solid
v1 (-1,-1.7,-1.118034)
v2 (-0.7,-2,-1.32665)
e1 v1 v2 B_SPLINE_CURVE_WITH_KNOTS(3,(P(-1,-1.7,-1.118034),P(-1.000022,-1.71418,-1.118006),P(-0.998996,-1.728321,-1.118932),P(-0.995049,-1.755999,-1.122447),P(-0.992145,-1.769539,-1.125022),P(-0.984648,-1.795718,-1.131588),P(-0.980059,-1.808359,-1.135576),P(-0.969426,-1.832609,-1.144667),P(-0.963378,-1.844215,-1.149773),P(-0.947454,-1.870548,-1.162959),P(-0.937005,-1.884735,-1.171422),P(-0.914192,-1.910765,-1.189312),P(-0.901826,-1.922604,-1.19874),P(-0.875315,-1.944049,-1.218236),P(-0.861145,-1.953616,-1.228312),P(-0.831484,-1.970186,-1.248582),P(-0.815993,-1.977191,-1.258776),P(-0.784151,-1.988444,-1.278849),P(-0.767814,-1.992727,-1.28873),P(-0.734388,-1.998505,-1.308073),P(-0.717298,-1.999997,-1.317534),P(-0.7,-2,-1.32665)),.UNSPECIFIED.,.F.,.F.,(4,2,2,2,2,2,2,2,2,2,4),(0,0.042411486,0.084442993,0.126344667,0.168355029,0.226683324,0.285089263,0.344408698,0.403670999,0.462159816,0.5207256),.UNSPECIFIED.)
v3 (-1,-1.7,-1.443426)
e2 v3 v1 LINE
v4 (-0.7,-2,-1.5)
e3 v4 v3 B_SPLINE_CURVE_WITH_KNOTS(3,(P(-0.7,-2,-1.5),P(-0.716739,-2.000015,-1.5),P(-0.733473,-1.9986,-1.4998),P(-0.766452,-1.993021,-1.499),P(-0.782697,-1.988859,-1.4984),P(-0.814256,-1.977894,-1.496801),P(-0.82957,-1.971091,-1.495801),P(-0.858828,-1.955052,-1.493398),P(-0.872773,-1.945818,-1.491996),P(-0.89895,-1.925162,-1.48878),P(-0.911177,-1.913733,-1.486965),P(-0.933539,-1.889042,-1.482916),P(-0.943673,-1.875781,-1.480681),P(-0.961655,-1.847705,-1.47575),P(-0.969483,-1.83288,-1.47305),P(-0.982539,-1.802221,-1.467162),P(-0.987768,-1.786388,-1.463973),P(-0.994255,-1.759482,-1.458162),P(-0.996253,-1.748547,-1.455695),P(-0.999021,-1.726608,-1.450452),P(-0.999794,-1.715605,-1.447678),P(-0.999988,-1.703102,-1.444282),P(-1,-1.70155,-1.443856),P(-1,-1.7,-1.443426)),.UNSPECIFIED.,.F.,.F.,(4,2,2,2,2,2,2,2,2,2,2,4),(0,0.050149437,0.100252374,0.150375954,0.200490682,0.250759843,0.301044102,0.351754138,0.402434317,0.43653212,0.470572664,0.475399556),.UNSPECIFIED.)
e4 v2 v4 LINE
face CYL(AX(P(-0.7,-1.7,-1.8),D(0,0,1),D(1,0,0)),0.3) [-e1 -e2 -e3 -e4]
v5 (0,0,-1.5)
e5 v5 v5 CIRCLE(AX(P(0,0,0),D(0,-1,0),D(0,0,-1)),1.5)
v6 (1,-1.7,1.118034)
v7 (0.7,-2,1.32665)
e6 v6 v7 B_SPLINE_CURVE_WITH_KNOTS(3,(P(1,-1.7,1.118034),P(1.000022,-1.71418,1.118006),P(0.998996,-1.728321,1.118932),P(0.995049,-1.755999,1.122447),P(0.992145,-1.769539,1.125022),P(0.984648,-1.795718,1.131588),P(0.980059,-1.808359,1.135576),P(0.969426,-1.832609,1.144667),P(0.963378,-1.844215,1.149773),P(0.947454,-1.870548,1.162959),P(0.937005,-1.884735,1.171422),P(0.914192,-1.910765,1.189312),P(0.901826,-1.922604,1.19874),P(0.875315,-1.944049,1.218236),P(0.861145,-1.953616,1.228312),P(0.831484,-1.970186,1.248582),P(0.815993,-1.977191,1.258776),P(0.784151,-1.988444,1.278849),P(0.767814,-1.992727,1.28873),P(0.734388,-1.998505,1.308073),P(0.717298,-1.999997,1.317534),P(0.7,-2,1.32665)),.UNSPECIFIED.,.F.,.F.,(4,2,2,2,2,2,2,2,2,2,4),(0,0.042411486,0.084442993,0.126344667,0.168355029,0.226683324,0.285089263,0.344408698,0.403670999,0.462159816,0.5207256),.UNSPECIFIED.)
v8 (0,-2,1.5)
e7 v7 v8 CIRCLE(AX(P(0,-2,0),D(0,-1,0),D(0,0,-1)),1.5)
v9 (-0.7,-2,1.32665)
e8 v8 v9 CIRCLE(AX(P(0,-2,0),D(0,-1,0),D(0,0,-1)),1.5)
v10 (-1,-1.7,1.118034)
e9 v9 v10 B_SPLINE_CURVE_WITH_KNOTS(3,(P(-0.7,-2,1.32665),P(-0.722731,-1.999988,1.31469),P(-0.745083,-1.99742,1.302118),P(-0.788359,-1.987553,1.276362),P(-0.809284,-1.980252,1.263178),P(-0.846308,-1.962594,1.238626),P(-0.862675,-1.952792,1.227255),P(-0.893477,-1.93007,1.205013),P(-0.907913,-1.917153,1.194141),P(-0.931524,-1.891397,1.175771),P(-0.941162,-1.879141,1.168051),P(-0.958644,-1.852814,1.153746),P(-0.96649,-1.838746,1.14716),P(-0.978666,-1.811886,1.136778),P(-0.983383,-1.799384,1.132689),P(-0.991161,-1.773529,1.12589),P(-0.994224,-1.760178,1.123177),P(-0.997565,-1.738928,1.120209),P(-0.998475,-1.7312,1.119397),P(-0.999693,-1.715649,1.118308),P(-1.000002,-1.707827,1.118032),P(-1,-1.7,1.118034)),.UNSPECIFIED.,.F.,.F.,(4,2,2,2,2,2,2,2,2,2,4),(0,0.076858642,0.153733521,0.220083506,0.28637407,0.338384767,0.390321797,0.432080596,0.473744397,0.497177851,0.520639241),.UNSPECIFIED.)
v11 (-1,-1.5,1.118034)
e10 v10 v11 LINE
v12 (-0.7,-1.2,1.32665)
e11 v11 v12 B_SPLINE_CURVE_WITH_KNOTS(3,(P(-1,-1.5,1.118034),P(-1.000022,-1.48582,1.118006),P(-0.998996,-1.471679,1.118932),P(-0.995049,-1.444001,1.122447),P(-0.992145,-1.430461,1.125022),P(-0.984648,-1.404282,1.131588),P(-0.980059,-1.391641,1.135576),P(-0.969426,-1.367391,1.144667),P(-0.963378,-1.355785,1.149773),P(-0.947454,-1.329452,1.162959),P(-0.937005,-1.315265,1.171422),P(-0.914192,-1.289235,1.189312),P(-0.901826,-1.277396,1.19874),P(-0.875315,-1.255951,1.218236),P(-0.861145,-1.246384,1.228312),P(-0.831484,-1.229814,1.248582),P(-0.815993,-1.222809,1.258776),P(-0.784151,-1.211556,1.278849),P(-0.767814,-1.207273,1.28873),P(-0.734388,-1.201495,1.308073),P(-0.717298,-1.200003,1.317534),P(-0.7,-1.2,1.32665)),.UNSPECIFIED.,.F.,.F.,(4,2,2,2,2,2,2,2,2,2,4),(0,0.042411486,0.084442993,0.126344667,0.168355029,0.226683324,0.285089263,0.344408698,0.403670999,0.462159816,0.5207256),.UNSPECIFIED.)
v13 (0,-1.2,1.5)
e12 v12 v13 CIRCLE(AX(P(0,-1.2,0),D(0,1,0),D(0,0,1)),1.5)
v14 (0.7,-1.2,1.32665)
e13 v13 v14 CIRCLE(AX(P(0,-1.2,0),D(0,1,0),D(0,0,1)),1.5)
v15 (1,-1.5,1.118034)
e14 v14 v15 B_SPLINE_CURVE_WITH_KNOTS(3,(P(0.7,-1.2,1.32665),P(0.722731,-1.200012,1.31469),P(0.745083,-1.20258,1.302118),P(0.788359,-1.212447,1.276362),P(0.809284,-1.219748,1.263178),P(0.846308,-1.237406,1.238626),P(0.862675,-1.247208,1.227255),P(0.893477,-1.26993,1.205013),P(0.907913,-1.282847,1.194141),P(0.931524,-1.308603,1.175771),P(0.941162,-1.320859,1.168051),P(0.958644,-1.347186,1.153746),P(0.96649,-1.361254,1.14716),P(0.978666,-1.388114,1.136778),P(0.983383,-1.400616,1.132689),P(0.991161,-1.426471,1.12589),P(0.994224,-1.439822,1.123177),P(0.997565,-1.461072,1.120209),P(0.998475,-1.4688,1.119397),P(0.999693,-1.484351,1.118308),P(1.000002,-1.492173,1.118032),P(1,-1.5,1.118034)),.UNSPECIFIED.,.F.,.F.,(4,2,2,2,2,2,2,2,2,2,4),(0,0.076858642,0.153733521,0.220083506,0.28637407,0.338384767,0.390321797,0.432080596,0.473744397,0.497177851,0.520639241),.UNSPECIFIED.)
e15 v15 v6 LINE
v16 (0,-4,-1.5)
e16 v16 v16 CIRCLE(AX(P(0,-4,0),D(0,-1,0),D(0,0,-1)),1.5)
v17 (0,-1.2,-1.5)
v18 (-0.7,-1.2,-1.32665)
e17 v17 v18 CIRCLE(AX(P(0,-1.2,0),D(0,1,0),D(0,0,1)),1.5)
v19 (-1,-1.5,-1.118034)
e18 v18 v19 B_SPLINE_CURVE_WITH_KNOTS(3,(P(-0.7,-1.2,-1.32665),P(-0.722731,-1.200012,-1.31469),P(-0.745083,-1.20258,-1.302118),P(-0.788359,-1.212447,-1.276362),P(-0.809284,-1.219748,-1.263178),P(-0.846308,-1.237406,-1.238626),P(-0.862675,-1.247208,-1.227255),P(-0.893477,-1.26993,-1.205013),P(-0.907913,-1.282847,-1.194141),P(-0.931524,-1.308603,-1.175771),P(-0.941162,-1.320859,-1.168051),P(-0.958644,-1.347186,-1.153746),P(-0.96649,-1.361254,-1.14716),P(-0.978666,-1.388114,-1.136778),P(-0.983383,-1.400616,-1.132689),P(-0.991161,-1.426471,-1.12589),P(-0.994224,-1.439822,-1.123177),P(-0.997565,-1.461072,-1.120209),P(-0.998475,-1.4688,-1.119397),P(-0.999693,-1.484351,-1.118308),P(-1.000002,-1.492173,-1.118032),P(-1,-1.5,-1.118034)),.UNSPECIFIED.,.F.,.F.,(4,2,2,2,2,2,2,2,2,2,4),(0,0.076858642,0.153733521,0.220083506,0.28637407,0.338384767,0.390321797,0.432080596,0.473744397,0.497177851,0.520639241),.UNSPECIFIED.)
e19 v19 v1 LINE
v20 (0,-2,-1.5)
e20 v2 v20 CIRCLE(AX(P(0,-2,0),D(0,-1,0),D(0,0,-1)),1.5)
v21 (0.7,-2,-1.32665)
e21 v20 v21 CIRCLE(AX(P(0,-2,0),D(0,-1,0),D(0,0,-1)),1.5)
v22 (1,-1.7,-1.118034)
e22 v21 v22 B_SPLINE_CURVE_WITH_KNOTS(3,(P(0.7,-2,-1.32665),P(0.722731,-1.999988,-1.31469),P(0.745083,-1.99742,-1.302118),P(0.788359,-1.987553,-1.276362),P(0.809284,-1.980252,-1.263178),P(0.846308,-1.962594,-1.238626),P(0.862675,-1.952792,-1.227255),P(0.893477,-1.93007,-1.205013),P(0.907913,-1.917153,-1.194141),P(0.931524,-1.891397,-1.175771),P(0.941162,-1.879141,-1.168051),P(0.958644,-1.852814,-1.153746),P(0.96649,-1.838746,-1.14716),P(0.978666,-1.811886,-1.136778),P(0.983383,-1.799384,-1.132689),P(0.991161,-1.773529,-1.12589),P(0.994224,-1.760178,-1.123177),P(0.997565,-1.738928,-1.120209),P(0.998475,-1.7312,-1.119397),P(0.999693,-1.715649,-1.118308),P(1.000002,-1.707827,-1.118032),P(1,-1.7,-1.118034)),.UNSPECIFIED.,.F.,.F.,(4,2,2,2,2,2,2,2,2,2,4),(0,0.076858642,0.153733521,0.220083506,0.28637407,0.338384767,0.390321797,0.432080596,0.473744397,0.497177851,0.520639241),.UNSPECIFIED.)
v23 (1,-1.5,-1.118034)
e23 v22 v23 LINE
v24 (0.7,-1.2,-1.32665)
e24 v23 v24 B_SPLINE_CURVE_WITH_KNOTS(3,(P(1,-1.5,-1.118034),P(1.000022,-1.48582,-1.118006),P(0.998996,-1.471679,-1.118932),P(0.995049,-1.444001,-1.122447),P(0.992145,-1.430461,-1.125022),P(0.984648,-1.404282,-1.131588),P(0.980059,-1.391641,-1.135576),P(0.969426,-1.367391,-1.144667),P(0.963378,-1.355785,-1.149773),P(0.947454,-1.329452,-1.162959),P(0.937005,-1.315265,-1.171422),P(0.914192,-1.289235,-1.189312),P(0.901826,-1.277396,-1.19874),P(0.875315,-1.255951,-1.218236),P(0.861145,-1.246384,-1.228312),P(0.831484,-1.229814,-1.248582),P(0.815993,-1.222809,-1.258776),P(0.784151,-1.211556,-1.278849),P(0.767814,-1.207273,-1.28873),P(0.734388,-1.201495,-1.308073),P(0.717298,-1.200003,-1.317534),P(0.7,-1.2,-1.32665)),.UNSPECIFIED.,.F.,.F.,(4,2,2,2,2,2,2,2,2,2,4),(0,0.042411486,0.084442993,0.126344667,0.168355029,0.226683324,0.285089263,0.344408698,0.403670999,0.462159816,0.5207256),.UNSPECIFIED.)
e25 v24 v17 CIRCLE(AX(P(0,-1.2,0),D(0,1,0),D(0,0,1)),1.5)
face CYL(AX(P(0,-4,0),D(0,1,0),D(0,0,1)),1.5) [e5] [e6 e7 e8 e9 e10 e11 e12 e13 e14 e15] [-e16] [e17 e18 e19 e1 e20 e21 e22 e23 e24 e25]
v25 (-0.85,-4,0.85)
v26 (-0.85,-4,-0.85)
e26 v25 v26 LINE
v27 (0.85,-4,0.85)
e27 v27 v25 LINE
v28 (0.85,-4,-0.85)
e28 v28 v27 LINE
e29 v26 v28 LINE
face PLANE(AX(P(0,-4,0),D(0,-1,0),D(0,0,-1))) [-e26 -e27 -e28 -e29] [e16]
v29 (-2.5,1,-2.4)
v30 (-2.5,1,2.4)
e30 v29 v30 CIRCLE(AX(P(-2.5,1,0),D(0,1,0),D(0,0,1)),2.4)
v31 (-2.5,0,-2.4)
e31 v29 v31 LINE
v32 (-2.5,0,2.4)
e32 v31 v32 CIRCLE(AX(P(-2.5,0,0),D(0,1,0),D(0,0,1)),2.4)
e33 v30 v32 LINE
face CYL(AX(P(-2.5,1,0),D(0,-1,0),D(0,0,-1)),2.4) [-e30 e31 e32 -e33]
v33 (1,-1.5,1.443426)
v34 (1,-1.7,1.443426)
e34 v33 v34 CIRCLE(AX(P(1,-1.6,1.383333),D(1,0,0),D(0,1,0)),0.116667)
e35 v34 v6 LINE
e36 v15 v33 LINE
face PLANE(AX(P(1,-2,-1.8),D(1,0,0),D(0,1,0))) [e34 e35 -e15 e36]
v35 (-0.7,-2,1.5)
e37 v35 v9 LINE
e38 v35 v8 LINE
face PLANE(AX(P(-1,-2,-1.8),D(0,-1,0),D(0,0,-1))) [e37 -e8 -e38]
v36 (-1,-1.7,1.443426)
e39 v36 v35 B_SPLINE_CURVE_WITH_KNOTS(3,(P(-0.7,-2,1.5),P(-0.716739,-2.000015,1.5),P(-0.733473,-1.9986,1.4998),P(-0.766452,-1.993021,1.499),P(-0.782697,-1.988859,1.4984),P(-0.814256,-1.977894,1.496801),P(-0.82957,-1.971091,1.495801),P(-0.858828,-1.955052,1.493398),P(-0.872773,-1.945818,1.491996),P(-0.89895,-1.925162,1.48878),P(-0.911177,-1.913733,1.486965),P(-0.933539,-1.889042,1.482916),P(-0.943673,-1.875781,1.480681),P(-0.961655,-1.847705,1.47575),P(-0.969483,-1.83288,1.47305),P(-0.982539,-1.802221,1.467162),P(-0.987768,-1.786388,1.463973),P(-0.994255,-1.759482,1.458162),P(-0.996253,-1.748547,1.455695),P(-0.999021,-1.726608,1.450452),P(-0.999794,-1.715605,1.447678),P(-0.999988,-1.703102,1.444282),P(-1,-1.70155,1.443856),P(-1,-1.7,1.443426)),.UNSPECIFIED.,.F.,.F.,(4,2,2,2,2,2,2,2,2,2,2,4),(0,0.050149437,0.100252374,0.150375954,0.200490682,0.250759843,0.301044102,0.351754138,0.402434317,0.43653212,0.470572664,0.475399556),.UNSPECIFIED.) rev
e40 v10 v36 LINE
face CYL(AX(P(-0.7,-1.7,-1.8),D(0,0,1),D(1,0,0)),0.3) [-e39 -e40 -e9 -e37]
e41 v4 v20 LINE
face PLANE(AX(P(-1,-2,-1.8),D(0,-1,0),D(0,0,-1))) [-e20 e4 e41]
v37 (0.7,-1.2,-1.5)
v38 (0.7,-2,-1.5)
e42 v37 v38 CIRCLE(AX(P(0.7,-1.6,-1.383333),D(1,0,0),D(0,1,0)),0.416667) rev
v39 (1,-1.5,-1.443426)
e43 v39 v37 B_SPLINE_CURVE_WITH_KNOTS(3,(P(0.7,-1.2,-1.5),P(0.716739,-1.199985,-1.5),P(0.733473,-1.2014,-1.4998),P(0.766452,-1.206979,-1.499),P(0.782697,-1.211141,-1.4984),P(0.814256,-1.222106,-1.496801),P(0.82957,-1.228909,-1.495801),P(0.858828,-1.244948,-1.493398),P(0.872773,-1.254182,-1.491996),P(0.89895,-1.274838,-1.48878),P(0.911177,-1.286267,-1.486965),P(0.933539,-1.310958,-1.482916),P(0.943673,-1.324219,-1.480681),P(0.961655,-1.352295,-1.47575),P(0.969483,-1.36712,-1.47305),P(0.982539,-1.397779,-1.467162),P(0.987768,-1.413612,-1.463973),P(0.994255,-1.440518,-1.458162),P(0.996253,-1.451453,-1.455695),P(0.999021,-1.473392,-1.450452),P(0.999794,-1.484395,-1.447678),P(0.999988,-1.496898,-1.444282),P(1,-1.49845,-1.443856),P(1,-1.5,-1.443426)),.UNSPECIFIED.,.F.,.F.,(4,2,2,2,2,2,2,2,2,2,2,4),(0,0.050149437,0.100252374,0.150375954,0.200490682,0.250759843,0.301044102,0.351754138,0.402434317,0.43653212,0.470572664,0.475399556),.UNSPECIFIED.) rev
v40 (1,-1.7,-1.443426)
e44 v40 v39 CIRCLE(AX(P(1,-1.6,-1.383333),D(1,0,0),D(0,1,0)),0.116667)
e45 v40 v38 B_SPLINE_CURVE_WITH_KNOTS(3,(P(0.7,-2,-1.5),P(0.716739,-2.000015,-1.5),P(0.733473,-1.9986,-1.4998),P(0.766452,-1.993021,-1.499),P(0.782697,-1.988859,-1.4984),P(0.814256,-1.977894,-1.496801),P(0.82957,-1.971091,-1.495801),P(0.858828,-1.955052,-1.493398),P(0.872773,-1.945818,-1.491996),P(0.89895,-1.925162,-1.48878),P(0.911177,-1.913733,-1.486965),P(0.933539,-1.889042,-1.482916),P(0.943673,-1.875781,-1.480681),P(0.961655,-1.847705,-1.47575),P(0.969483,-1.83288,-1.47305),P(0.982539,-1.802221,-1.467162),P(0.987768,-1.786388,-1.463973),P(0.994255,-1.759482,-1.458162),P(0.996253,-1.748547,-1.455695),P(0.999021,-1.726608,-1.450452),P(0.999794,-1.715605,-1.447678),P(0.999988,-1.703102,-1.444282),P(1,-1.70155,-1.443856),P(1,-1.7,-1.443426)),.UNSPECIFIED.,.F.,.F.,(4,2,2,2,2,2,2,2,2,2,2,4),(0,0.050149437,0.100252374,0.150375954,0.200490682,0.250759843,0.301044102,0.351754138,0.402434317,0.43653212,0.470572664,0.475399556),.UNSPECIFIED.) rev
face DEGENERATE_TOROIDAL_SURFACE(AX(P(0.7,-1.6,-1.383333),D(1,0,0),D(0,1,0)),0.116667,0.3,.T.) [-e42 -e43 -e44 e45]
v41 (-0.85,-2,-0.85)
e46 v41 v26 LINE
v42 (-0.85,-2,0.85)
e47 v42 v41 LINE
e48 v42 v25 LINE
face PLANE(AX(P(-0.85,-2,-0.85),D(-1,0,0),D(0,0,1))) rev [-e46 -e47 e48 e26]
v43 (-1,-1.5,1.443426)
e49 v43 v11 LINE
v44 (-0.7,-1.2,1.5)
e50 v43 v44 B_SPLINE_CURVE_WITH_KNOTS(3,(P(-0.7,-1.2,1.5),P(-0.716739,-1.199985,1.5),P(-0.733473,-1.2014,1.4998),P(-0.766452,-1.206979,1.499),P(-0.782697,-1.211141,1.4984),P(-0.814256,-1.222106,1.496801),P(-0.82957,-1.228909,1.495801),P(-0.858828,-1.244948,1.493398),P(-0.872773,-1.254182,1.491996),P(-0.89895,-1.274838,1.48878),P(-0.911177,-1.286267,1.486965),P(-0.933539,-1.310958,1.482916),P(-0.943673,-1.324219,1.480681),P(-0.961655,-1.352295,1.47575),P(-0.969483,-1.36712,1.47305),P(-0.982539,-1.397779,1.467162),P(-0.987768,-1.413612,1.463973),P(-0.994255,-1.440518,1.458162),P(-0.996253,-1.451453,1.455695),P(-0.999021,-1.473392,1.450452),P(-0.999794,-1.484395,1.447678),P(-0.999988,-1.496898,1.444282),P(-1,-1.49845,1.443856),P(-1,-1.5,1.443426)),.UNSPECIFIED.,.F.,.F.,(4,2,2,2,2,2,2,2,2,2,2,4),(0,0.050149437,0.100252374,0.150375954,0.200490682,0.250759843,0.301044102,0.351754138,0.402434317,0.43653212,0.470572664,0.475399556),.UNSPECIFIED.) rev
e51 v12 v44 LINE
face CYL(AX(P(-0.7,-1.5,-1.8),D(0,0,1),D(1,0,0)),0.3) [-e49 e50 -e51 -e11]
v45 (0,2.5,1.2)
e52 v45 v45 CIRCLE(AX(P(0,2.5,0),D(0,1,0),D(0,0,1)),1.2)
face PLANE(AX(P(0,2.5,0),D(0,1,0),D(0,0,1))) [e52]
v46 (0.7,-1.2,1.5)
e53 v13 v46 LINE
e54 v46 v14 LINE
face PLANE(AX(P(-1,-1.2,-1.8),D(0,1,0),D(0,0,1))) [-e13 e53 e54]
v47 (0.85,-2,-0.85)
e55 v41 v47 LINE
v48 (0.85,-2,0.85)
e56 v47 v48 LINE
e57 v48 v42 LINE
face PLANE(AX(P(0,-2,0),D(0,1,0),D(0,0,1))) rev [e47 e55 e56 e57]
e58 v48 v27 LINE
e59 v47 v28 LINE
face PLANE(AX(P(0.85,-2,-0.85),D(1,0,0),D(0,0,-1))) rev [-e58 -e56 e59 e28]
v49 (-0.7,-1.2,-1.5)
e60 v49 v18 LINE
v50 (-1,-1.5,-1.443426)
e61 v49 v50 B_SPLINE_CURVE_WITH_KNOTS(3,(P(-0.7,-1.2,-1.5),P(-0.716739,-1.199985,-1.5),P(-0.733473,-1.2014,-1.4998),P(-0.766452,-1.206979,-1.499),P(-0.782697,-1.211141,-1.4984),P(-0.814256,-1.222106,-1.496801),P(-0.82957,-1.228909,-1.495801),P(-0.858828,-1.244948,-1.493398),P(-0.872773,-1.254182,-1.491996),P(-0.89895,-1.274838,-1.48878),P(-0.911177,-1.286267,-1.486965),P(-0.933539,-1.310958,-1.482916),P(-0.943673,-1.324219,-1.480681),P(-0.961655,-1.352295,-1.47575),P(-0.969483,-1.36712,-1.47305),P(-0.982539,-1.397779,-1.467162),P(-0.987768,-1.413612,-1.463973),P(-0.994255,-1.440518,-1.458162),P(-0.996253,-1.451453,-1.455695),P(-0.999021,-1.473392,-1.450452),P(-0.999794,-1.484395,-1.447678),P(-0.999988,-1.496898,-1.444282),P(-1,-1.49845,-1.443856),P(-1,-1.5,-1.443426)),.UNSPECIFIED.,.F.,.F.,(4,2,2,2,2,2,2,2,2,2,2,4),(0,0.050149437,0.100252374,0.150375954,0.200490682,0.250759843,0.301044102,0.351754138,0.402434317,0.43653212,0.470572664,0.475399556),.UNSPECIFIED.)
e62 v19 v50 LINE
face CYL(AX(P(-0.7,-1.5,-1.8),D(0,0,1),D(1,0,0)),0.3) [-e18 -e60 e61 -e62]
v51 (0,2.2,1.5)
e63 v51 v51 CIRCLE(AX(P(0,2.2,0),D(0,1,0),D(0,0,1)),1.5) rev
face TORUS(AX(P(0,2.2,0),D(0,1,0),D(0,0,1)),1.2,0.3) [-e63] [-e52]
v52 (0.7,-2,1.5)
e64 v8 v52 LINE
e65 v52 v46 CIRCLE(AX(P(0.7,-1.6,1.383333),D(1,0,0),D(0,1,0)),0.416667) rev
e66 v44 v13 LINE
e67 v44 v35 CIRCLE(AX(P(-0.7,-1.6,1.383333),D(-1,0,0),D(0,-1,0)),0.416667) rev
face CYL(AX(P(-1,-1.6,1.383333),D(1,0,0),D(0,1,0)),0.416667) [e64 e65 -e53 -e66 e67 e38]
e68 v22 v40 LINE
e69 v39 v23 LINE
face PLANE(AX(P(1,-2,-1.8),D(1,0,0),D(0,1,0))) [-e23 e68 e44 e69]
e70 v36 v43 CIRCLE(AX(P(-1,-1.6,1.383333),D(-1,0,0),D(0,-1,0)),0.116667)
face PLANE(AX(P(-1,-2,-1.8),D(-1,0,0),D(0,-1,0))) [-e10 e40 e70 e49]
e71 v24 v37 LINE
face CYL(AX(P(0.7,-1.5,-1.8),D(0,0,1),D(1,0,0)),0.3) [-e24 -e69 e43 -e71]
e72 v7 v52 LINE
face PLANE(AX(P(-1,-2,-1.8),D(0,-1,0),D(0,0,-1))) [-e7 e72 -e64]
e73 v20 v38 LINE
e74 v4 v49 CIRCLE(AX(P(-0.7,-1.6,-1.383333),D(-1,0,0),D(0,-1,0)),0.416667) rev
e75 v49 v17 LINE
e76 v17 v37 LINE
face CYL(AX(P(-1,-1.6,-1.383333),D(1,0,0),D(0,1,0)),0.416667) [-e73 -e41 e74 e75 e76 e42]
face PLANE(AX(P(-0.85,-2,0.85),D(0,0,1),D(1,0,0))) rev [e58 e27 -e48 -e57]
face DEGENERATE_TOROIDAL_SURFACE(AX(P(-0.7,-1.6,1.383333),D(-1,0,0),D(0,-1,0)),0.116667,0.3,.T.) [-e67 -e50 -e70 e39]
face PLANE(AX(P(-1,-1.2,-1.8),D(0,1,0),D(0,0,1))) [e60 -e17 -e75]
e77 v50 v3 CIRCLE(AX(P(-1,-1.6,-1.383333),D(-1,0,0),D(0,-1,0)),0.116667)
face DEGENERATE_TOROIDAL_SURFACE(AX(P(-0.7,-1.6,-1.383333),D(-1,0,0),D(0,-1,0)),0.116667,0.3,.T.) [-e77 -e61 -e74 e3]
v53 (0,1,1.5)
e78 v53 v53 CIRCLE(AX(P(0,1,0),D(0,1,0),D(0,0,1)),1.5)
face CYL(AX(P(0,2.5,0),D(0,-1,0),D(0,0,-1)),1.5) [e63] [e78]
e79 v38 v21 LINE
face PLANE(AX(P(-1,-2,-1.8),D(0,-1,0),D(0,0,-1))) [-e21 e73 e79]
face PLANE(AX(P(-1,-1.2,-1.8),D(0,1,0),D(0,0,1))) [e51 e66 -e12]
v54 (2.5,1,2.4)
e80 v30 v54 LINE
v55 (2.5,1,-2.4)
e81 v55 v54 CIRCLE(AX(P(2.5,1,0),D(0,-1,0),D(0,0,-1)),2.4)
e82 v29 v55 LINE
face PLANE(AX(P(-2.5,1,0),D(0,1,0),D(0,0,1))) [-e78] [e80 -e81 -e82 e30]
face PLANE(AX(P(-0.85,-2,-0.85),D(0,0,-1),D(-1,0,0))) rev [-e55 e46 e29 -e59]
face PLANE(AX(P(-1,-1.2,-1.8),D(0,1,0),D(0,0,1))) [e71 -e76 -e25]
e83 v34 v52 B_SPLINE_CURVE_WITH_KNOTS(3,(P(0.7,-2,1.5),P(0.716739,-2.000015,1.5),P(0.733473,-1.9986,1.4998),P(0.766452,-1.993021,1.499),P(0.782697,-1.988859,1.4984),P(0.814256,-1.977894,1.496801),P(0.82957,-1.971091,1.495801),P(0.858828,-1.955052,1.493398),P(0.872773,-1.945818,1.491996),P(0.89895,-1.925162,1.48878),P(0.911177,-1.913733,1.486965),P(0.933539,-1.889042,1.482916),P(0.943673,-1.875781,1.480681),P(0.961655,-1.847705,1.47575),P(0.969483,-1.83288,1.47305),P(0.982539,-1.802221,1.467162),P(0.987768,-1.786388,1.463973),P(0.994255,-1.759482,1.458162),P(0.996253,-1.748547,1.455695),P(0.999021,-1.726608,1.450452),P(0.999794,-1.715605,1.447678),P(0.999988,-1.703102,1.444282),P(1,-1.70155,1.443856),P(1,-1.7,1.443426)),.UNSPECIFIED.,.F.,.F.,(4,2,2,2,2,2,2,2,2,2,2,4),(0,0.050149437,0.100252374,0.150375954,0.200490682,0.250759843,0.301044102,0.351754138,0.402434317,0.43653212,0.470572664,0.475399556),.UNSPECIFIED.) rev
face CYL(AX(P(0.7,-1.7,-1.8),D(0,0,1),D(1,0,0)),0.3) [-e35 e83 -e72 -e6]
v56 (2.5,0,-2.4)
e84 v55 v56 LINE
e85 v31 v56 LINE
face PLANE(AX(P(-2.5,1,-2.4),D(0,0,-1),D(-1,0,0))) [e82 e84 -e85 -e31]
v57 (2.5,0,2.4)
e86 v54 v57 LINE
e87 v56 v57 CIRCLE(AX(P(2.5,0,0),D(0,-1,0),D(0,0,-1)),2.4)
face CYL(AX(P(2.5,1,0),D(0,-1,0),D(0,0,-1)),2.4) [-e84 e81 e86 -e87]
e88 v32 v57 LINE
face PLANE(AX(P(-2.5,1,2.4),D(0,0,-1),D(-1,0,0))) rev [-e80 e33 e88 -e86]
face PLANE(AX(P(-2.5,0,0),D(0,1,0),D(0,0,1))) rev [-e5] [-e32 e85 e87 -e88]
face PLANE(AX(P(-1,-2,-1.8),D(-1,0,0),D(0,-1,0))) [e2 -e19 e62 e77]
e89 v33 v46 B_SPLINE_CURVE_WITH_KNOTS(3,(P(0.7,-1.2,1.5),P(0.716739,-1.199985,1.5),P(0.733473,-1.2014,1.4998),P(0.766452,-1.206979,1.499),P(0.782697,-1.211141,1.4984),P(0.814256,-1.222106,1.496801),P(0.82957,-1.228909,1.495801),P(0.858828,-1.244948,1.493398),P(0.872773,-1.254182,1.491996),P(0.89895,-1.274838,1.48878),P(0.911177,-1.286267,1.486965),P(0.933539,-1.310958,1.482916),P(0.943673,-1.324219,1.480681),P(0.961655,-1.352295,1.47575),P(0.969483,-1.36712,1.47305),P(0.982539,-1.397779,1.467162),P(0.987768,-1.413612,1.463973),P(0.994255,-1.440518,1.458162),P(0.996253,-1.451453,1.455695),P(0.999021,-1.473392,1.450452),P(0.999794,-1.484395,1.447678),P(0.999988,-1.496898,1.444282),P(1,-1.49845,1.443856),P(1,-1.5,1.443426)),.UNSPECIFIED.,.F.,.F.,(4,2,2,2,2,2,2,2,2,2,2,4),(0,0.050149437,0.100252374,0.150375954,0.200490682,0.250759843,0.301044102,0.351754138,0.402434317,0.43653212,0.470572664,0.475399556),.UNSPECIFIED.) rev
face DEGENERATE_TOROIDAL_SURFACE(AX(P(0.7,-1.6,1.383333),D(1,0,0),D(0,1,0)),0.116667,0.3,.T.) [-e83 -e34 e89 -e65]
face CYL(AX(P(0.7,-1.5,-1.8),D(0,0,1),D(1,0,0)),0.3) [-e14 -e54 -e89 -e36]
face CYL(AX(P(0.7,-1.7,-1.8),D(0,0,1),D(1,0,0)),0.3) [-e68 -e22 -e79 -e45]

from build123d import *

# Parameters (mm, degrees)
EXTRUDE_1294_DEPTH   = 1
SKETCH_1344_R        = 1.5
EXTRUDE_1_DEPTH      = 1.5
EXTRUDE_START        = 4
SKETCH_1505_R        = 1.5
EXTRUDE_2_DEPTH      = 4
EXTRUDE_3_DEPTH      = 1.8
EXTRUDE_3_DEPTH_BACK = 1.8
CUT_EXTRUDE_1_DEPTH  = 2
SKETCH_6_W           = 1.7
SKETCH_6_H           = 1.7
CUT_EXTRUDE_2_DEPTH  = 2
FILLET_1_R           = 0.3


with BuildPart() as part:
    # Sketch 213 → Extrude 1294 (new body)
    with BuildSketch(Plane(origin=(0, 0, 0), x_dir=(1, 0, 0), z_dir=(0, 1, 0))):
        with BuildLine():
            Line((-2.4999999999999996, -2.4), (2.5000000000000004, -2.4))
            ThreePointArc((2.5000000000000004, -2.4), (4.9, 0), (2.5000000000000004, 2.4))
            Line((2.5000000000000004, 2.4), (-2.4999999999999996, 2.4))
            ThreePointArc((-2.4999999999999996, 2.4), (-4.8999999999999995, 2.9e-16), (-2.4999999999999996, -2.4))
        make_face()
    extrude(amount=EXTRUDE_1294_DEPTH)

    # Sketch 1344 → 凸台-拉伸1 (add)
    with BuildSketch(Plane(origin=(0, 1, 0), x_dir=(1, 0, 0), z_dir=(0, 1, 0))):
        Circle(SKETCH_1344_R)
    extrude(amount=EXTRUDE_1_DEPTH)

    # Sketch 1505 → 凸台-拉伸2 (add)
    with BuildSketch(Plane.XZ.offset(EXTRUDE_START)):
        Circle(SKETCH_1505_R)
    extrude(amount=-EXTRUDE_2_DEPTH)

    # Sketch 1641 → 凸台-拉伸3 (add, two sides: drawn at the far end of the back side and taken through both)
    with BuildSketch(Plane.XY.offset(-EXTRUDE_3_DEPTH_BACK)):
        Polygon((-1.0000000000000002, -2), (0.9999999999999998, -2), (0.9999999999999996, -1.2000000000000002), (-1.0000000000000004, -1.2000000000000002), align=None)
    extrude(amount=EXTRUDE_3_DEPTH + EXTRUDE_3_DEPTH_BACK)

    # 草图4 → 切除-拉伸1 (cut)
    with BuildSketch(Plane(origin=(0.9999999999999991, 2.7e-16, 0), x_dir=(0, 0, -1), z_dir=(1, 2.7e-16, 0))):
        with BuildLine():
            Line((1.8, -2), (1.8, -1.5999999999999996))
            ThreePointArc((1.7999999999999998, -1.5999999999999996), (1.7166666666666668, -1.8499999999999996), (1.5000000000000004, -2))
            Line((1.5000000000000002, -2), (1.8, -2))
        make_face()
        with BuildLine():
            Line((1.8, -1.2000000000000004), (1.5000000000000002, -1.2000000000000002))
            ThreePointArc((1.5000000000000002, -1.2000000000000002), (1.7166666666666663, -1.35), (1.7999999999999998, -1.5999999999999996))
            Line((1.8, -1.5999999999999996), (1.8, -1.2000000000000004))
        make_face()
        with BuildLine():
            Line((-1.5000000000000002, -1.2000000000000002), (-1.8, -1.2000000000000004))
            Line((-1.8, -1.2000000000000004), (-1.8, -1.6000000000000005))
            ThreePointArc((-1.7999999999999998, -1.6000000000000005), (-1.7166666666666668, -1.3500000000000005), (-1.5000000000000004, -1.2000000000000002))
        make_face()
        with BuildLine():
            ThreePointArc((-1.5000000000000002, -2), (-1.7166666666666663, -1.85), (-1.7999999999999998, -1.6000000000000005))
            Line((-1.8, -1.6000000000000005), (-1.8, -2))
            Line((-1.8, -2), (-1.5000000000000002, -2))
        make_face()
    extrude(amount=-CUT_EXTRUDE_1_DEPTH, mode=Mode.SUBTRACT)

    # 草图6 → 切除-拉伸2 (cut)
    with BuildSketch(Plane.XZ.offset(4)):
        Rectangle(SKETCH_6_W, SKETCH_6_H)
    extrude(amount=-CUT_EXTRUDE_2_DEPTH, mode=Mode.SUBTRACT)

    # 圆角1
    fillet_1_edges = [part.edges().sort_by_distance(p)[0] for p in [
        (-1.5, 2.5, -1.8e-16),
        (-1.0000000000000004, -1.2000000000000002, 1.3090169943749475),
        (-1.0000000000000004, -1.6, 1.7999999999999998),
        (-1.0000000000000002, -2, 1.3090169943749475),
        (0.9999999999999998, -2, 1.3090169943749477),
        (0.9999999999999996, -1.6000000000000003, 1.7999999999999998),
        (0.9999999999999996, -1.2000000000000002, 1.3090169943749481),
        (-1.0000000000000004, -1.2000000000000002, -1.3090169943749472),
        (-1.0000000000000004, -1.6000000000000005, -1.7999999999999998),
        (-1.0000000000000002, -2, -1.3090169943749477),
        (0.9999999999999996, -1.2000000000000002, -1.309016994374948),
        (0.9999999999999998, -2, -1.3090169943749477),
        (0.9999999999999996, -1.5999999999999994, -1.7999999999999998),
    ]]
    fillet(fillet_1_edges, radius=FILLET_1_R)


solid = part.part
